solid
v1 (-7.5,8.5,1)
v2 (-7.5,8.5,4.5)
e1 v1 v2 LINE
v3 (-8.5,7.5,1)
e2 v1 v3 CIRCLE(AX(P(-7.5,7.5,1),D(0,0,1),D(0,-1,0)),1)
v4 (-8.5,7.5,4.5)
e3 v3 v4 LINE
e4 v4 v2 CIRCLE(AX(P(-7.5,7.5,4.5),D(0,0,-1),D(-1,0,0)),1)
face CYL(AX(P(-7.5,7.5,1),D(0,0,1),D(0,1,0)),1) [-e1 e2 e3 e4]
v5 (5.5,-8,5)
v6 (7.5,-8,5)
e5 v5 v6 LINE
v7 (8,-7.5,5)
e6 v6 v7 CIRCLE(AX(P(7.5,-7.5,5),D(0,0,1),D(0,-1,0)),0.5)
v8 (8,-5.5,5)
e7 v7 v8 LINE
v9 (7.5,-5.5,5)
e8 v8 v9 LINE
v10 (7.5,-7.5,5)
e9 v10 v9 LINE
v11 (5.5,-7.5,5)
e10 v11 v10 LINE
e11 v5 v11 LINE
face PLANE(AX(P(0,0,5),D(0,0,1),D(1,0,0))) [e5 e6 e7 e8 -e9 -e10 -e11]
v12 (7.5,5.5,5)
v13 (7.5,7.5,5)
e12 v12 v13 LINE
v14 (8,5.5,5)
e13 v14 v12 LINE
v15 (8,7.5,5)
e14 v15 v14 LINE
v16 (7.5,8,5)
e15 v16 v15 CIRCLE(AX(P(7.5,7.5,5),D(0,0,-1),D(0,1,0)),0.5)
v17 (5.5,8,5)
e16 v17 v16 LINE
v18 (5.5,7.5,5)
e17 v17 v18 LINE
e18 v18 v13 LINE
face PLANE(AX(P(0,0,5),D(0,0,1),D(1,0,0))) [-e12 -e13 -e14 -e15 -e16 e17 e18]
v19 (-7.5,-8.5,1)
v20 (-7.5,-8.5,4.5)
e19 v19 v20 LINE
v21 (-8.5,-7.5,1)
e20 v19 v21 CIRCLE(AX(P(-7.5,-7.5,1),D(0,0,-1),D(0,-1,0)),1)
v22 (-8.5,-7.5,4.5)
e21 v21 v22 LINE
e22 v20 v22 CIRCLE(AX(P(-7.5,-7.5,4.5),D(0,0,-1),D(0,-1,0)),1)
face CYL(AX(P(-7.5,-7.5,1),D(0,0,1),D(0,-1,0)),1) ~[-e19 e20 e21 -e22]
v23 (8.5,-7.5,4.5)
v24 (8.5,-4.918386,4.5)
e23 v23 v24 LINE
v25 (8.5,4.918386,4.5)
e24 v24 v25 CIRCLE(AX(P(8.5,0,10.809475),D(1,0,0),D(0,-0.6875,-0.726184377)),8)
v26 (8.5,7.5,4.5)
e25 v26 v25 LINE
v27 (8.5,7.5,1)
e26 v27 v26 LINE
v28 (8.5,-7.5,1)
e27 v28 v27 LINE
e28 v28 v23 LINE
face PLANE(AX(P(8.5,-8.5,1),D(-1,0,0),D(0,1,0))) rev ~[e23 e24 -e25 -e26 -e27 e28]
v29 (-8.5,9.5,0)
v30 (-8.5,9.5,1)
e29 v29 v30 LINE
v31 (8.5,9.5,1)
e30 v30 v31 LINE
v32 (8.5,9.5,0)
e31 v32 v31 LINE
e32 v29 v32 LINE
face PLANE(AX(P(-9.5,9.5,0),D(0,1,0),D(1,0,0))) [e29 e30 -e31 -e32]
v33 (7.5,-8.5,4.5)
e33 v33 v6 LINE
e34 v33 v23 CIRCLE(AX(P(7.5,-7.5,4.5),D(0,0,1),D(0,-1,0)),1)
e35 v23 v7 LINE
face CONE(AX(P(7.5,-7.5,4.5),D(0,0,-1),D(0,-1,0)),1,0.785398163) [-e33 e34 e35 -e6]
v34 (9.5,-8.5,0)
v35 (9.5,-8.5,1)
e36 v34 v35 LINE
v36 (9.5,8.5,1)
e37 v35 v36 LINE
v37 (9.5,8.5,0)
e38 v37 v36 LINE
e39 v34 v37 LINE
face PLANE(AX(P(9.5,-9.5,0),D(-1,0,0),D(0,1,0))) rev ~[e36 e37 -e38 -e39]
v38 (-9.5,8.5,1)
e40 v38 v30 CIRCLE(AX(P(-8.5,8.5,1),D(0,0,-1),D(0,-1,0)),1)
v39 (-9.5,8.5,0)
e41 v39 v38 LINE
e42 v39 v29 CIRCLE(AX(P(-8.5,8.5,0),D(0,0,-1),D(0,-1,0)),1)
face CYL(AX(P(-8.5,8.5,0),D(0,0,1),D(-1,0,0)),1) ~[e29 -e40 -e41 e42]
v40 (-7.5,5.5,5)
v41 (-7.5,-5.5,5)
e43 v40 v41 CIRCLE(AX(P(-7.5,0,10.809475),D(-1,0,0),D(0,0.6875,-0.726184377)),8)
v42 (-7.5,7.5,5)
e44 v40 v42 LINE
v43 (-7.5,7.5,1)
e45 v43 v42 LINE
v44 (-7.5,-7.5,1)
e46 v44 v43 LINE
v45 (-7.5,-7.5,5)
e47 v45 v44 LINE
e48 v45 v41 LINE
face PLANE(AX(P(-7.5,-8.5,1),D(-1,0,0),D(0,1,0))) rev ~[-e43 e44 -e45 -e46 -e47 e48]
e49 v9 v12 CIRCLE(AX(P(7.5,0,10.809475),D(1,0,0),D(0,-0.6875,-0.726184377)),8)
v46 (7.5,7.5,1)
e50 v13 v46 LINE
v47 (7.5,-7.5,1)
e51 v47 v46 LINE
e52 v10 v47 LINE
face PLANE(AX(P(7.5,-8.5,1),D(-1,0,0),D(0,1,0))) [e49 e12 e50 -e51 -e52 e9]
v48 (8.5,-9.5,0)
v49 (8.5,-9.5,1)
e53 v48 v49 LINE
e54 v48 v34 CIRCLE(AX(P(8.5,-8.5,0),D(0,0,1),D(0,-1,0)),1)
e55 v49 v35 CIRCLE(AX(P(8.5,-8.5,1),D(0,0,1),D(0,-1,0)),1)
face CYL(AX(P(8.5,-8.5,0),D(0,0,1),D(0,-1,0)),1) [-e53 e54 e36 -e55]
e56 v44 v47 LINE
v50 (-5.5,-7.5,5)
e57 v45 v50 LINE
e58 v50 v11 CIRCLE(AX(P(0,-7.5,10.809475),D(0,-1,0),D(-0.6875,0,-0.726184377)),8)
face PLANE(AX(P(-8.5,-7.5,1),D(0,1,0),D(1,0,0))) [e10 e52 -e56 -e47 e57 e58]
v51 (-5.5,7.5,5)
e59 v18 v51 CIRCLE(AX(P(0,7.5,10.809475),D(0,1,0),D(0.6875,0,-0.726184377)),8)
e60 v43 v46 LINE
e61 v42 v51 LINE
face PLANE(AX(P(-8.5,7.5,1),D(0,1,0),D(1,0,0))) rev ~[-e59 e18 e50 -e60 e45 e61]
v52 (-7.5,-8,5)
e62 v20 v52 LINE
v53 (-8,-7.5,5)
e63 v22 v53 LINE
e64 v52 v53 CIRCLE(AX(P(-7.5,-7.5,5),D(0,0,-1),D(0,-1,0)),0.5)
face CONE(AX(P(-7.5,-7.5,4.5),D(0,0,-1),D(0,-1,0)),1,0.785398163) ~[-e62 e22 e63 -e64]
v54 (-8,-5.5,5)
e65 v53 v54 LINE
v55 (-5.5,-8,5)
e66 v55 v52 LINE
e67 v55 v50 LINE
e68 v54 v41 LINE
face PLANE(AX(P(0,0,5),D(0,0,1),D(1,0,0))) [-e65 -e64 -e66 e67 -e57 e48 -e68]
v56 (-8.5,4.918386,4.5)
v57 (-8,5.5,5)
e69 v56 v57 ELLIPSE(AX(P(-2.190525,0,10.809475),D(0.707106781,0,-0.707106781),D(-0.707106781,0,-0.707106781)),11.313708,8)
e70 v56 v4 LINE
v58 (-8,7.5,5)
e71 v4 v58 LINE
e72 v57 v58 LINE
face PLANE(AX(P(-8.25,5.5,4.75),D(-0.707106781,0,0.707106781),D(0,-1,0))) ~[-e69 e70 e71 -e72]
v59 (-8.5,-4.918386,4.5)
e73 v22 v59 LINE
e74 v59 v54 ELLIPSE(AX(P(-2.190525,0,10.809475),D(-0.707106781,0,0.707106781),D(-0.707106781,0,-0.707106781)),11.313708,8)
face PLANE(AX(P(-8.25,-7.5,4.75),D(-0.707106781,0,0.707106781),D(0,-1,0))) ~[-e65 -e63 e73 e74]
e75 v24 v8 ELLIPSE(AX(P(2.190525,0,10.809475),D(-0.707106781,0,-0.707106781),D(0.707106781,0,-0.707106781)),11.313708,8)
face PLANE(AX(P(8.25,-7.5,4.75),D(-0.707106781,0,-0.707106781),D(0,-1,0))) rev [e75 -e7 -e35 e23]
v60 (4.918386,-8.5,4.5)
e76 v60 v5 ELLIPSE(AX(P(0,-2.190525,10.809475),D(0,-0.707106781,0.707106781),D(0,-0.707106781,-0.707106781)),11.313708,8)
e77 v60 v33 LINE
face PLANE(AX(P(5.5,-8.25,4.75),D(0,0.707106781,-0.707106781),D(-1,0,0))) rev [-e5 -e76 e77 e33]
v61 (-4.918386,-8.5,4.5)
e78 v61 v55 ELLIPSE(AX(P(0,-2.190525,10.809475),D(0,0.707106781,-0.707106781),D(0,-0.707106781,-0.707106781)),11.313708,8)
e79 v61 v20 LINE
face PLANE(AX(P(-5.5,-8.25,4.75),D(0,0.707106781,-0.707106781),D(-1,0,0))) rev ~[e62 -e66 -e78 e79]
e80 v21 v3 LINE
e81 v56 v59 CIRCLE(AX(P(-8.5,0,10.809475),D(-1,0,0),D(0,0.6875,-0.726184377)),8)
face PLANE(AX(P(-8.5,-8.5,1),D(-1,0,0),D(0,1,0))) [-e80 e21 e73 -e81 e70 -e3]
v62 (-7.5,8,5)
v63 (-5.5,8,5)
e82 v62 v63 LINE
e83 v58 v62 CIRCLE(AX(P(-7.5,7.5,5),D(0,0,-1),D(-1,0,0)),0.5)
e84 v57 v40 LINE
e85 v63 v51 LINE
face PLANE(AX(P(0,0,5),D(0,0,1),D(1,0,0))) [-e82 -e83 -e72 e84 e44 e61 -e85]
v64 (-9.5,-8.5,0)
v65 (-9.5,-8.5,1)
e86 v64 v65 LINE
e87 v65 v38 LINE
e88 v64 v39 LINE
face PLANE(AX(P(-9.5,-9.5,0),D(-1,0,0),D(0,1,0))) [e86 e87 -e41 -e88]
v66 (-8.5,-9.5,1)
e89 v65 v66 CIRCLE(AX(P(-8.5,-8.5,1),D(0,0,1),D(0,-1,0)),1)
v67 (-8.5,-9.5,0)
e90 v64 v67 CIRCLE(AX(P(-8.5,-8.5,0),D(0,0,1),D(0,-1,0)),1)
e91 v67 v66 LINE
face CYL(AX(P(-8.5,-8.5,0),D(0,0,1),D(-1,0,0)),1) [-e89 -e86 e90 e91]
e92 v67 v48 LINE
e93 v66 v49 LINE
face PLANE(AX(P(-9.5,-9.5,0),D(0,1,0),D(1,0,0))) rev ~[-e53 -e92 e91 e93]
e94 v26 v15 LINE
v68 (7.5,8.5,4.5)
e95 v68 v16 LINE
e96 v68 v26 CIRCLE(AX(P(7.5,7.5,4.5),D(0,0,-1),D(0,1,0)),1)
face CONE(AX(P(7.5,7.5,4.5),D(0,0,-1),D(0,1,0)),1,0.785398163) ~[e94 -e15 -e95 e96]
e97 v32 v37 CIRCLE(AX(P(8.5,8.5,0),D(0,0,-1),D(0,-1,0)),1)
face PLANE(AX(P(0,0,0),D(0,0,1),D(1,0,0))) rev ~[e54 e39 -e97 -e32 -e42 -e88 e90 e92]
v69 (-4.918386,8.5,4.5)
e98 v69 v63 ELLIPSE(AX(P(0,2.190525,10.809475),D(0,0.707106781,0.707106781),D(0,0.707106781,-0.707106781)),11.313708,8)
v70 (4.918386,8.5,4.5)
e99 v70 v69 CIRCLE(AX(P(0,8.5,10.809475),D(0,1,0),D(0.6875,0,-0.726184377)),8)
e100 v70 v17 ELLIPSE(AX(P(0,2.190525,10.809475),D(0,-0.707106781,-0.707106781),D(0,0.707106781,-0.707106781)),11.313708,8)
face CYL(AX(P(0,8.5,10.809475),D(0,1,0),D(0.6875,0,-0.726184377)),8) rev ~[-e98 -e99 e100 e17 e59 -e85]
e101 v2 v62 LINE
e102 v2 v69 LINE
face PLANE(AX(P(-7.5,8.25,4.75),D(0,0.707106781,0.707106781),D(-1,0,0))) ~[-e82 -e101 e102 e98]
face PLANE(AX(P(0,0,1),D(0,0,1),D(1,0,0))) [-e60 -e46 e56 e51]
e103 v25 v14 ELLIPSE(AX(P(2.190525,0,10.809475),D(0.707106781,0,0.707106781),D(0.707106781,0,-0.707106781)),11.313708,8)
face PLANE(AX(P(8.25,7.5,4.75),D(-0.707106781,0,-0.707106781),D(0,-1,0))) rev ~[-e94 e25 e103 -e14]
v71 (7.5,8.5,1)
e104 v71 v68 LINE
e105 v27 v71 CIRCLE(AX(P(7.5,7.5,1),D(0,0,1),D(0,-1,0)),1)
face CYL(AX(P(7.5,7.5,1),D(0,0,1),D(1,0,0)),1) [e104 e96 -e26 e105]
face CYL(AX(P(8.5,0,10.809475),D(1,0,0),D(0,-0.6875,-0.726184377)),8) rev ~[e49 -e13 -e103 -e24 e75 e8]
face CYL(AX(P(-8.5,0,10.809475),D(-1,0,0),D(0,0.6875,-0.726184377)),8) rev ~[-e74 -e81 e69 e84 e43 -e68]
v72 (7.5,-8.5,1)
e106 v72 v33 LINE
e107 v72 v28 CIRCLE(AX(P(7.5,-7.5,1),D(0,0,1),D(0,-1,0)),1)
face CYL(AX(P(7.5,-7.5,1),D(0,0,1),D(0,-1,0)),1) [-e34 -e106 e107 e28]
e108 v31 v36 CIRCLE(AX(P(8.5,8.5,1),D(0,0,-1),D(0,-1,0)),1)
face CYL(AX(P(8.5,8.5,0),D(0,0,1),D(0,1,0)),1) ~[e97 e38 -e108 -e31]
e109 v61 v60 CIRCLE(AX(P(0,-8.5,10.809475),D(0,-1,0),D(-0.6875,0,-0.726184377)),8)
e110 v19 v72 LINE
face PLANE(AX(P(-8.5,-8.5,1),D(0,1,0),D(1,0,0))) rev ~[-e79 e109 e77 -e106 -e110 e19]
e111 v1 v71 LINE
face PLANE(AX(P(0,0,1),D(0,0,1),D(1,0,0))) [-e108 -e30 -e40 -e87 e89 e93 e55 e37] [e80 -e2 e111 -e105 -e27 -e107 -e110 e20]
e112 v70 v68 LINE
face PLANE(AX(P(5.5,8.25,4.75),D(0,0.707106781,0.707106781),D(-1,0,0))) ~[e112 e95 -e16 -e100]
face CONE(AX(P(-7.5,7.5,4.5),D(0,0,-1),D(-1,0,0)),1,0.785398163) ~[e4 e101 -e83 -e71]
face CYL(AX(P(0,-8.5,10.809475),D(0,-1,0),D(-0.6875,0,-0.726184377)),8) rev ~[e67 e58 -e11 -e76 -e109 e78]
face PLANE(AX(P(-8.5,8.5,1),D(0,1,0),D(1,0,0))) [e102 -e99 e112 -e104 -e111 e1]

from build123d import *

# Parameters (mm, degrees)
F0_W            = 19
F0_H            = 19
F1_DEPTH        = 1
F2_W            = 17
F2_H            = 17
F3_DEPTH        = 4
F4_T            = 1
F4_T3_DEPTH     = 19
F4_T5_DEPTH     = 19
F6_DEPTH        = 2
F6_COPIES_COUNT = 4
F8_R            = 1
F9_SIZE         = 0.5


# Not quite as in the source:
# - a pattern or mirror of a feature is missing from the dataset's text; its kind, count and spacing are read off the source's solid
# - a shell that OpenCascade refuses in one call is made with other operations: the cavity is built on its own and cut out


with BuildPart() as f1:
    # F0 (on Top) → F1 (new body)
    with BuildSketch(Plane.XY):
        Rectangle(F0_W, F0_H)
    extrude(amount=F1_DEPTH)

    # F2 (on face) → F3 (join)
    with BuildSketch(Plane.XY.offset(1)):
        Rectangle(F2_W, F2_H)
    extrude(amount=F3_DEPTH)

    # F4: shell of thickness 1, made by hand


with BuildPart() as f4_core1:
    # F4_t2: copy of F1
    add(f1.part)

    # the walls: a layer under each face that stays
    f4_faces = [f4_core1.faces().sort_by_distance(p)[0] for p in [
        (0, -9.5, 0.5),
        (-9.5, 0, 0.5),
        (9.5, 0, 0.5),
        (0, 0, 0),
        (-8.8666666667, -8.8666666667, 1),
        (0, 9.5, 0.5),
        (8.5, 0, 3),
        (0, 8.5, 3),
        (-8.5, 0, 3),
        (0, -8.5, 3),
    ]]
    thicken(f4_faces, amount=-F4_T, mode=Mode.SUBTRACT)

    # F4_s4 → F4_t3 (cut)
    with BuildSketch(Plane.XZ.offset(-9.5)):
        Polygon((8.51, 1.01), (8.5, 0), (7.5, 0), (7.5, 1), align=None)
        Polygon((-8.51, 1.01), (-8.5, 0), (-7.5, 0), (-7.5, 1), align=None)
    extrude(amount=F4_T3_DEPTH, mode=Mode.SUBTRACT)

    # F4_s6 → F4_t5 (cut)
    with BuildSketch(Plane.YZ.offset(-9.5)):
        Polygon((8.51, 1.01), (8.5, 0), (7.5, 0), (7.5, 1), align=None)
        Polygon((-8.51, 1.01), (-8.5, 0), (-7.5, 0), (-7.5, 1), align=None)
    extrude(amount=F4_T5_DEPTH, mode=Mode.SUBTRACT)


with BuildPart() as f1_1:
    add(f1.part)

    # what is left inside the walls is the cavity
    f4_cavity = [f4_core1.part.solids().sort_by_distance(p)[0] for p in [
        (0, -2.5, 1.01),
    ]]
    add(f4_cavity, mode=Mode.SUBTRACT)

    # F5 (on face) → F6 (cut)
    with BuildSketch(Plane.XZ.offset(8.5)):
        with BuildLine():
            Line((5.5, 5), (-5.5, 5))
            ThreePointArc((-5.5, 5), (0, 2.8094750193), (5.5, 5))
        make_face()
    f6 = extrude(amount=-F6_DEPTH, mode=Mode.SUBTRACT)

    # F6_copies: F6 ×4 about axis
    f6_copies_axis = Axis((0, 0, 0), (0, 0, 1))
    for i in range(1, F6_COPIES_COUNT):
        add(f6.rotate(f6_copies_axis, i * 360 / F6_COPIES_COUNT), mode=Mode.SUBTRACT)

    # F8
    f8_edges = [f1_1.edges().sort_by_distance(p)[0] for p in [
        (-8.5, -8.5, 3),
        (-9.5, -9.5, 0.5),
        (8.5, -8.5, 3),
        (9.5, -9.5, 0.5),
        (8.5, 8.5, 3),
        (9.5, 9.5, 0.5),
        (-8.5, 8.5, 3),
        (-9.5, 9.5, 0.5),
    ]]
    fillet(f8_edges, radius=F8_R)

    # F9
    f9_edges = [f1_1.edges().sort_by_distance(p)[0] for p in [
        (6.5, 8.5, 5),
        (-6.5, 8.5, 5),
        (-8.5, 6.5, 5),
        (-8.5, -6.5, 5),
        (6.5, -8.5, 5),
        (8.5, -6.5, 5),
        (8.5, 6.5, 5),
        (8.207107, -8.207107, 5),
        (8.207107, 8.207107, 5),
        (-6.5, -8.5, 5),
        (-8.207107, -8.207107, 5),
        (-8.207107, 8.207107, 5),
    ]]
    chamfer(f9_edges, length=F9_SIZE)


solid = f1_1.part
